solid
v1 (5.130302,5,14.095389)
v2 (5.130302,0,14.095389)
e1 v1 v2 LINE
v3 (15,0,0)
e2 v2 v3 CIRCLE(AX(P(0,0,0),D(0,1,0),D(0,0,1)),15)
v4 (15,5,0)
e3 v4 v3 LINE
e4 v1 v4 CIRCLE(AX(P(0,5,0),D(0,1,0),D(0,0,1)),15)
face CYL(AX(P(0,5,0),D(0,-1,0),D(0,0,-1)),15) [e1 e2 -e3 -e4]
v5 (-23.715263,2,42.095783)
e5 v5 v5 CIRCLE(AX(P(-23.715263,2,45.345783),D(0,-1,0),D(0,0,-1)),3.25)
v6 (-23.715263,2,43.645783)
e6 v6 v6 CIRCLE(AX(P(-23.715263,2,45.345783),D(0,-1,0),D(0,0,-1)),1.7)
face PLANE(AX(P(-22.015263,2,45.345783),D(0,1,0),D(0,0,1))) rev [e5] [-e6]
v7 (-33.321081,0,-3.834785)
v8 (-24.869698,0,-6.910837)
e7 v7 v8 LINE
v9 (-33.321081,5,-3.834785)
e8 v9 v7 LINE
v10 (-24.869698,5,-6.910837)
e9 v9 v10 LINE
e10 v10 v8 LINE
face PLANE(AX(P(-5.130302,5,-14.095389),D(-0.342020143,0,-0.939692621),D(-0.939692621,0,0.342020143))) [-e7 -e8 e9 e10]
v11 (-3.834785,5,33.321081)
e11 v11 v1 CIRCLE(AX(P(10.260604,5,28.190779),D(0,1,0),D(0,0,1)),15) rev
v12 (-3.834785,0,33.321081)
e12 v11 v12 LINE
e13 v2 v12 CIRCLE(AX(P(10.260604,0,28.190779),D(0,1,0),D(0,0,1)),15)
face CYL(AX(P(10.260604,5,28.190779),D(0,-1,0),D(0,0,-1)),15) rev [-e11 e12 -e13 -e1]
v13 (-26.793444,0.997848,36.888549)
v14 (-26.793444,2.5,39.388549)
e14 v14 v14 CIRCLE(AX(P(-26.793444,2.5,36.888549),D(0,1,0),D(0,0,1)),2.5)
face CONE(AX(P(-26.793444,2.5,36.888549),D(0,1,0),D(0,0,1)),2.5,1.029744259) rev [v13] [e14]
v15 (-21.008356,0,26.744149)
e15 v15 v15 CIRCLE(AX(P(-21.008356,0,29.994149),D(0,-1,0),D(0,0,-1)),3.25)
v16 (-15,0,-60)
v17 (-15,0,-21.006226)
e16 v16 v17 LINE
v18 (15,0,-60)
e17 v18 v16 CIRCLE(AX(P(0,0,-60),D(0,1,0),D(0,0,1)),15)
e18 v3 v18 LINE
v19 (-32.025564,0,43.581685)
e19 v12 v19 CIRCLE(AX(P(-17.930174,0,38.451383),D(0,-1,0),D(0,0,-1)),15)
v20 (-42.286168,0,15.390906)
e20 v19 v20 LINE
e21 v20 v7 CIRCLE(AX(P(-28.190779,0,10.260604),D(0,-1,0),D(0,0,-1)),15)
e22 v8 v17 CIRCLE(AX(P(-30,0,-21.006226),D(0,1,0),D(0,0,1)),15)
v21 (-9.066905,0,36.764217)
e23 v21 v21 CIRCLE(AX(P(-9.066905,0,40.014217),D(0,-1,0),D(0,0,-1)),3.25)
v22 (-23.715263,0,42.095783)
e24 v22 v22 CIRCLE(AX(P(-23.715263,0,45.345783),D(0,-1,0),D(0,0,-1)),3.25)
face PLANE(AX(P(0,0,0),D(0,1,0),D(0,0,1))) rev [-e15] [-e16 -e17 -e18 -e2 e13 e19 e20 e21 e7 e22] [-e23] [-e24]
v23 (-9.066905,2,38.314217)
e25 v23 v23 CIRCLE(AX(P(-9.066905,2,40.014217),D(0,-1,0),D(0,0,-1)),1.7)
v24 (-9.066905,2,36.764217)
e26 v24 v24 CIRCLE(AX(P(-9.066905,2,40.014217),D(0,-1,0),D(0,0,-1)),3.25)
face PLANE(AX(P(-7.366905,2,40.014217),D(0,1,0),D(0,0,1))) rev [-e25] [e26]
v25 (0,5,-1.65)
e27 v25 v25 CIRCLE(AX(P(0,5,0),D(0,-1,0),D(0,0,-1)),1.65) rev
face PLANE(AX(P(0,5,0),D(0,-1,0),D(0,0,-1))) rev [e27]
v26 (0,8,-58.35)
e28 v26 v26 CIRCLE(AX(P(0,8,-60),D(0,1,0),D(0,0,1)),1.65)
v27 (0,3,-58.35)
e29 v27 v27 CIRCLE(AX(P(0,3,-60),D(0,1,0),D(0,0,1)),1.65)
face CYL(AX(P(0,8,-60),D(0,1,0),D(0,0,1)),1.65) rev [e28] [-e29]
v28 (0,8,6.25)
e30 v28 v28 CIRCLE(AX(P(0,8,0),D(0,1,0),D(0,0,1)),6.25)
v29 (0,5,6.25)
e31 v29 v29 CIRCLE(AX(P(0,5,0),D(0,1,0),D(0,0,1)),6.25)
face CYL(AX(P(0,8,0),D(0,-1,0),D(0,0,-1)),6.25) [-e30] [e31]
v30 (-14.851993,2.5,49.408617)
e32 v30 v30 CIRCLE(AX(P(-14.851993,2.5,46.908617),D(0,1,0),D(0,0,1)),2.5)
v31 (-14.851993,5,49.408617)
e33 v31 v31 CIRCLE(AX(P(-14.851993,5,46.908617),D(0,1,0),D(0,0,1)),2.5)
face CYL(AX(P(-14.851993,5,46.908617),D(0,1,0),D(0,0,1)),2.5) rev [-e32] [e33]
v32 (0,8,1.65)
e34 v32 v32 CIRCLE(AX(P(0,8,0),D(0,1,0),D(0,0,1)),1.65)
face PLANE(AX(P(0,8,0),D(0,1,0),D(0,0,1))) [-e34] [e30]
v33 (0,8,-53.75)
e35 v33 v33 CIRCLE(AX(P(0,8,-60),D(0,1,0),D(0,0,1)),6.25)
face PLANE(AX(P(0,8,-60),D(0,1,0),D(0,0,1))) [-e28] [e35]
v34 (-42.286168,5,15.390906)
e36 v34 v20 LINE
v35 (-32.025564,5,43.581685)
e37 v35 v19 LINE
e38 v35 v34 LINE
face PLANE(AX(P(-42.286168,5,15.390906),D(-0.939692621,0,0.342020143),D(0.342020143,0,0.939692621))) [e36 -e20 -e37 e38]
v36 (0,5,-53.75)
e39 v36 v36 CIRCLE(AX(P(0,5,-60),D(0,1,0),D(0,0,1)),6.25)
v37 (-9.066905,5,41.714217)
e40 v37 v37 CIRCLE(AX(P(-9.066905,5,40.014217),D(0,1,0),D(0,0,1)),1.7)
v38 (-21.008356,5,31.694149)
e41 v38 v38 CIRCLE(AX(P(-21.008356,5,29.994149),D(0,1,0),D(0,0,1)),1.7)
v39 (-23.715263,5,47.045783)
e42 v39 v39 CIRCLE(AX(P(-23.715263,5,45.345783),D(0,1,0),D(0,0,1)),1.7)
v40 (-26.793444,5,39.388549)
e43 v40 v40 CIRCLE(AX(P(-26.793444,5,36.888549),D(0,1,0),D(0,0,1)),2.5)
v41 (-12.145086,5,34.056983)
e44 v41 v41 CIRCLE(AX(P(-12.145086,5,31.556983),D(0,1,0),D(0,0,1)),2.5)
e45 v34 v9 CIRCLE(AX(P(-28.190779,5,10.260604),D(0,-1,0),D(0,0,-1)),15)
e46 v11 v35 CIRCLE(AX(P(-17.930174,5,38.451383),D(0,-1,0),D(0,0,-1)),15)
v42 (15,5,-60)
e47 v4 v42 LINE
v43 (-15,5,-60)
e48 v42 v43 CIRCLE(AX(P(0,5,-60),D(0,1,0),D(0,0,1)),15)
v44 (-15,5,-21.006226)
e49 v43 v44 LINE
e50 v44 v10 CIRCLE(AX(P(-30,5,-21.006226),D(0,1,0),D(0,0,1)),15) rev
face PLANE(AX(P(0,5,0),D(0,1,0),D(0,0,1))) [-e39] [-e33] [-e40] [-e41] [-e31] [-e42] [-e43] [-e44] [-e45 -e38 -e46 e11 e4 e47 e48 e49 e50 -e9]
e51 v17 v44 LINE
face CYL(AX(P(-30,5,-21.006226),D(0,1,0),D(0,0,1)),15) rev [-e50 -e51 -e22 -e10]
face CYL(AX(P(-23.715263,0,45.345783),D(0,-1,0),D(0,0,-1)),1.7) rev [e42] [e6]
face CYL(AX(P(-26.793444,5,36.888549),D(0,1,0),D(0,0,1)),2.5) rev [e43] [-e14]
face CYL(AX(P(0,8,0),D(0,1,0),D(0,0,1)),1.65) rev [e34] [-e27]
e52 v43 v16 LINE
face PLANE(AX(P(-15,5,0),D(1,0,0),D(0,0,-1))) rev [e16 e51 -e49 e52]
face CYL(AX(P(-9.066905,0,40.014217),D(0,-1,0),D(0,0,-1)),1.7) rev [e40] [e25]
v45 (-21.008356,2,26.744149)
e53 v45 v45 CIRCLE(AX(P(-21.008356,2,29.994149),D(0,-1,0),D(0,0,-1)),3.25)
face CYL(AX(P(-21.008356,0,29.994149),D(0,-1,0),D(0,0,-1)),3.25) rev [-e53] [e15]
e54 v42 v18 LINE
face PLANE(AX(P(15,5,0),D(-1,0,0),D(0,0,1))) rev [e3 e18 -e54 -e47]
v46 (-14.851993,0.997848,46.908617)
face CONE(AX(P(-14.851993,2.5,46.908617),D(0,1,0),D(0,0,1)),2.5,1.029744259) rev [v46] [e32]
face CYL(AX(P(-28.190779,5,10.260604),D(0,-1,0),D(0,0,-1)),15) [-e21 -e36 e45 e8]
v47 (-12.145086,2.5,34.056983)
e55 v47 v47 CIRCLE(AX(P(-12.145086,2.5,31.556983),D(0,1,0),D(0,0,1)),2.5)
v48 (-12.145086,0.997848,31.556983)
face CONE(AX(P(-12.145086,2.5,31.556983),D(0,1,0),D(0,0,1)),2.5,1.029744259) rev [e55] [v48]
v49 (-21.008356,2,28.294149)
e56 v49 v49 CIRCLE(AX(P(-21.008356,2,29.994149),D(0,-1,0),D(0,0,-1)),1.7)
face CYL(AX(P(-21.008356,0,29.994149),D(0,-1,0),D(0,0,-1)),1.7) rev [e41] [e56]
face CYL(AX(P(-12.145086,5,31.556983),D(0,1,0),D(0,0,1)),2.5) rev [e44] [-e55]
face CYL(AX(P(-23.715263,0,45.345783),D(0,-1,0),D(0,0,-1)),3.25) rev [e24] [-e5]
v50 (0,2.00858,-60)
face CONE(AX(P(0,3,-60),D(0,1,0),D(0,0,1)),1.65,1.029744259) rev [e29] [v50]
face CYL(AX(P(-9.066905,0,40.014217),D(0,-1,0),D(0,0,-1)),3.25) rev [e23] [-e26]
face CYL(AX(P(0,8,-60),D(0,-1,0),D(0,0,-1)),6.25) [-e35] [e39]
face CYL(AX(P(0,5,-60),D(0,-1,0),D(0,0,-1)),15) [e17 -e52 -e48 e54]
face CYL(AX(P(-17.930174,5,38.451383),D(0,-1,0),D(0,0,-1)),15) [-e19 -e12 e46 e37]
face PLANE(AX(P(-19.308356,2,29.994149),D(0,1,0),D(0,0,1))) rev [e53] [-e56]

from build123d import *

# Parameters (mm, degrees)
EXTRUDE_1_DEPTH              = 5
SKETCH_2_R                   = 6.25
EXTRUDE_2_DEPTH              = 3
HOLE_WIZARD_M4_1_D           = 3.3
HOLE_WIZARD_M4_1_DEPTH       = 5
HOLE_WIZARD_M4_1_TIP         = 0.991420021
EXTRUDE_3_DEPTH              = 5
EXTRUDE_4_DEPTH              = 5
HOLE_WIZARD_M3_1_D           = 3.4
HOLE_WIZARD_M3_1_CBORE_D     = 6.5
HOLE_WIZARD_M3_1_CBORE_DEPTH = 2
PATTERN_CIRCULAR_2_COUNT     = 3
PATTERN_CIRCULAR_3_COUNT     = 3
FILLET_1_R                   = 15


with BuildPart() as part:
    # 스케치1 → 보스-돌출1 (new body)
    with BuildSketch(Plane(origin=(0, 0, 0), x_dir=(1, 0, 0), z_dir=(0, 1, 0))):
        with BuildLine():
            Line((-15, 0), (-15, 60))
            ThreePointArc((-15, 60), (0, 75), (15, 60))
            Line((15, 60), (15, 0))
            ThreePointArc((15, 0), (0, -15), (-15, 0))
        make_face()
    extrude(amount=EXTRUDE_1_DEPTH)

    # 스케치2 → 보스-돌출2 (add)
    with BuildSketch(Plane(origin=(0, 5, 0), x_dir=(1, 0, 0), z_dir=(0, 1, 0))):
        with Locations(Location((0, 60, 0), (0, 0, 270))):
            Circle(SKETCH_2_R)
        with Locations(Location((0, 0, 0), (0, 0, 270))):
            Circle(SKETCH_2_R)
    extrude(amount=EXTRUDE_2_DEPTH)

    # M4 탭을 위한 탭 드릴1
    with Locations(Plane(origin=(0, 8, 0), x_dir=(1, 0, 0), z_dir=(0, 1, 0))):
        with Locations((0, 0), (0, 60)):
            Hole(HOLE_WIZARD_M4_1_D / 2, depth=HOLE_WIZARD_M4_1_DEPTH)
            with Locations((0, 0, -(HOLE_WIZARD_M4_1_DEPTH + HOLE_WIZARD_M4_1_TIP / 2))):  # 118° drill point
                Cone(0, HOLE_WIZARD_M4_1_D / 2, HOLE_WIZARD_M4_1_TIP, mode=Mode.SUBTRACT)

    # 스케치9 → 보스-돌출3 (add)
    with BuildSketch(Plane.XZ):
        with BuildLine():
            Line((-5.13030215, -14.095389312), (-33.321080773, -3.834785012))
            ThreePointArc((-33.321080773, -3.834785012), (-42.286167935, 15.39090645), (-23.060476474, 24.355993612))
            Line((-23.060476474, 24.355993612), (5.13030215, 14.095389312))
            ThreePointArc((5.13030215, 14.095389312), (14.095389312, -5.13030215), (-5.13030215, -14.095389312))
        make_face()
    extrude(amount=-EXTRUDE_3_DEPTH)

    # 스케치10 → 보스-돌출4 (add)
    with BuildSketch(Plane.XZ):
        with BuildLine():
            Line((-42.286167935, 15.39090645), (-32.025563636, 43.581685073))
            ThreePointArc((-32.025563636, 43.581685073), (-12.799872174, 52.546772235), (-3.834785012, 33.321080773))
            Line((-3.834785012, 33.321080773), (-14.095389312, 5.13030215))
            ThreePointArc((-14.095389312, 5.13030215), (-33.321080773, -3.834785012), (-42.286167935, 15.39090645))
        make_face()
    extrude(amount=-EXTRUDE_4_DEPTH)

    # M3 육각 소켓 머리 캡 나사용 카운터보어1 (through all)
    with Locations(Plane(origin=(0, 0, 0), x_dir=(-1, 0, 0), z_dir=(0, -1, 0))):
        with Locations((21.008355614, -29.994149336)):
            hole_wizard_m3_1 = CounterBoreHole(HOLE_WIZARD_M3_1_D / 2, HOLE_WIZARD_M3_1_CBORE_D / 2, HOLE_WIZARD_M3_1_CBORE_DEPTH)

    # 원형 패턴2: M3 육각 소켓 머리 캡 나사용 카운터보어1 ×3 about axis
    pattern_circular_2_axis = Axis((-17.930174324, 0, 38.451382923), (0, 1, 0))
    for i in range(1, PATTERN_CIRCULAR_2_COUNT):
        add(hole_wizard_m3_1.rotate(pattern_circular_2_axis, i * 360 / PATTERN_CIRCULAR_2_COUNT), mode=Mode.SUBTRACT)

    # 스케치18 → Ø5.0mm 맞춤핀 구멍1 (revolve, cut)
    with BuildSketch(Plane(origin=(-14.851993034, 5, 46.90861651), x_dir=(0, 0, 1), z_dir=(1, 0, 0))):
        Polygon((0, 0), (0, 4.002151548), (2.5, 2.5), (2.5, 0), align=None)
    f_5_0mm_1 = revolve(axis=Axis((-14.851993034, 11.35, 46.90861651), (0, -1, 0)), mode=Mode.SUBTRACT)

    # 원형 패턴3: Ø5.0mm 맞춤핀 구멍1 ×3 about axis
    pattern_circular_3_axis = Axis((-17.930174324, 0, 38.451382923), (0, 1, 0))
    for i in range(1, PATTERN_CIRCULAR_3_COUNT):
        add(f_5_0mm_1.rotate(pattern_circular_3_axis, i * 360 / PATTERN_CIRCULAR_3_COUNT), mode=Mode.SUBTRACT)

    # 필렛1
    fillet_1_edges = [part.edges().sort_by_distance(p)[0] for p in [
        (-8.965087162, 2.5, 19.225691462),
        (-15, 2.5, -10.503113073),
    ]]
    fillet(fillet_1_edges, radius=FILLET_1_R - 0.0001)  # a hair under: the kernel refuses the full size


solid = part.part
